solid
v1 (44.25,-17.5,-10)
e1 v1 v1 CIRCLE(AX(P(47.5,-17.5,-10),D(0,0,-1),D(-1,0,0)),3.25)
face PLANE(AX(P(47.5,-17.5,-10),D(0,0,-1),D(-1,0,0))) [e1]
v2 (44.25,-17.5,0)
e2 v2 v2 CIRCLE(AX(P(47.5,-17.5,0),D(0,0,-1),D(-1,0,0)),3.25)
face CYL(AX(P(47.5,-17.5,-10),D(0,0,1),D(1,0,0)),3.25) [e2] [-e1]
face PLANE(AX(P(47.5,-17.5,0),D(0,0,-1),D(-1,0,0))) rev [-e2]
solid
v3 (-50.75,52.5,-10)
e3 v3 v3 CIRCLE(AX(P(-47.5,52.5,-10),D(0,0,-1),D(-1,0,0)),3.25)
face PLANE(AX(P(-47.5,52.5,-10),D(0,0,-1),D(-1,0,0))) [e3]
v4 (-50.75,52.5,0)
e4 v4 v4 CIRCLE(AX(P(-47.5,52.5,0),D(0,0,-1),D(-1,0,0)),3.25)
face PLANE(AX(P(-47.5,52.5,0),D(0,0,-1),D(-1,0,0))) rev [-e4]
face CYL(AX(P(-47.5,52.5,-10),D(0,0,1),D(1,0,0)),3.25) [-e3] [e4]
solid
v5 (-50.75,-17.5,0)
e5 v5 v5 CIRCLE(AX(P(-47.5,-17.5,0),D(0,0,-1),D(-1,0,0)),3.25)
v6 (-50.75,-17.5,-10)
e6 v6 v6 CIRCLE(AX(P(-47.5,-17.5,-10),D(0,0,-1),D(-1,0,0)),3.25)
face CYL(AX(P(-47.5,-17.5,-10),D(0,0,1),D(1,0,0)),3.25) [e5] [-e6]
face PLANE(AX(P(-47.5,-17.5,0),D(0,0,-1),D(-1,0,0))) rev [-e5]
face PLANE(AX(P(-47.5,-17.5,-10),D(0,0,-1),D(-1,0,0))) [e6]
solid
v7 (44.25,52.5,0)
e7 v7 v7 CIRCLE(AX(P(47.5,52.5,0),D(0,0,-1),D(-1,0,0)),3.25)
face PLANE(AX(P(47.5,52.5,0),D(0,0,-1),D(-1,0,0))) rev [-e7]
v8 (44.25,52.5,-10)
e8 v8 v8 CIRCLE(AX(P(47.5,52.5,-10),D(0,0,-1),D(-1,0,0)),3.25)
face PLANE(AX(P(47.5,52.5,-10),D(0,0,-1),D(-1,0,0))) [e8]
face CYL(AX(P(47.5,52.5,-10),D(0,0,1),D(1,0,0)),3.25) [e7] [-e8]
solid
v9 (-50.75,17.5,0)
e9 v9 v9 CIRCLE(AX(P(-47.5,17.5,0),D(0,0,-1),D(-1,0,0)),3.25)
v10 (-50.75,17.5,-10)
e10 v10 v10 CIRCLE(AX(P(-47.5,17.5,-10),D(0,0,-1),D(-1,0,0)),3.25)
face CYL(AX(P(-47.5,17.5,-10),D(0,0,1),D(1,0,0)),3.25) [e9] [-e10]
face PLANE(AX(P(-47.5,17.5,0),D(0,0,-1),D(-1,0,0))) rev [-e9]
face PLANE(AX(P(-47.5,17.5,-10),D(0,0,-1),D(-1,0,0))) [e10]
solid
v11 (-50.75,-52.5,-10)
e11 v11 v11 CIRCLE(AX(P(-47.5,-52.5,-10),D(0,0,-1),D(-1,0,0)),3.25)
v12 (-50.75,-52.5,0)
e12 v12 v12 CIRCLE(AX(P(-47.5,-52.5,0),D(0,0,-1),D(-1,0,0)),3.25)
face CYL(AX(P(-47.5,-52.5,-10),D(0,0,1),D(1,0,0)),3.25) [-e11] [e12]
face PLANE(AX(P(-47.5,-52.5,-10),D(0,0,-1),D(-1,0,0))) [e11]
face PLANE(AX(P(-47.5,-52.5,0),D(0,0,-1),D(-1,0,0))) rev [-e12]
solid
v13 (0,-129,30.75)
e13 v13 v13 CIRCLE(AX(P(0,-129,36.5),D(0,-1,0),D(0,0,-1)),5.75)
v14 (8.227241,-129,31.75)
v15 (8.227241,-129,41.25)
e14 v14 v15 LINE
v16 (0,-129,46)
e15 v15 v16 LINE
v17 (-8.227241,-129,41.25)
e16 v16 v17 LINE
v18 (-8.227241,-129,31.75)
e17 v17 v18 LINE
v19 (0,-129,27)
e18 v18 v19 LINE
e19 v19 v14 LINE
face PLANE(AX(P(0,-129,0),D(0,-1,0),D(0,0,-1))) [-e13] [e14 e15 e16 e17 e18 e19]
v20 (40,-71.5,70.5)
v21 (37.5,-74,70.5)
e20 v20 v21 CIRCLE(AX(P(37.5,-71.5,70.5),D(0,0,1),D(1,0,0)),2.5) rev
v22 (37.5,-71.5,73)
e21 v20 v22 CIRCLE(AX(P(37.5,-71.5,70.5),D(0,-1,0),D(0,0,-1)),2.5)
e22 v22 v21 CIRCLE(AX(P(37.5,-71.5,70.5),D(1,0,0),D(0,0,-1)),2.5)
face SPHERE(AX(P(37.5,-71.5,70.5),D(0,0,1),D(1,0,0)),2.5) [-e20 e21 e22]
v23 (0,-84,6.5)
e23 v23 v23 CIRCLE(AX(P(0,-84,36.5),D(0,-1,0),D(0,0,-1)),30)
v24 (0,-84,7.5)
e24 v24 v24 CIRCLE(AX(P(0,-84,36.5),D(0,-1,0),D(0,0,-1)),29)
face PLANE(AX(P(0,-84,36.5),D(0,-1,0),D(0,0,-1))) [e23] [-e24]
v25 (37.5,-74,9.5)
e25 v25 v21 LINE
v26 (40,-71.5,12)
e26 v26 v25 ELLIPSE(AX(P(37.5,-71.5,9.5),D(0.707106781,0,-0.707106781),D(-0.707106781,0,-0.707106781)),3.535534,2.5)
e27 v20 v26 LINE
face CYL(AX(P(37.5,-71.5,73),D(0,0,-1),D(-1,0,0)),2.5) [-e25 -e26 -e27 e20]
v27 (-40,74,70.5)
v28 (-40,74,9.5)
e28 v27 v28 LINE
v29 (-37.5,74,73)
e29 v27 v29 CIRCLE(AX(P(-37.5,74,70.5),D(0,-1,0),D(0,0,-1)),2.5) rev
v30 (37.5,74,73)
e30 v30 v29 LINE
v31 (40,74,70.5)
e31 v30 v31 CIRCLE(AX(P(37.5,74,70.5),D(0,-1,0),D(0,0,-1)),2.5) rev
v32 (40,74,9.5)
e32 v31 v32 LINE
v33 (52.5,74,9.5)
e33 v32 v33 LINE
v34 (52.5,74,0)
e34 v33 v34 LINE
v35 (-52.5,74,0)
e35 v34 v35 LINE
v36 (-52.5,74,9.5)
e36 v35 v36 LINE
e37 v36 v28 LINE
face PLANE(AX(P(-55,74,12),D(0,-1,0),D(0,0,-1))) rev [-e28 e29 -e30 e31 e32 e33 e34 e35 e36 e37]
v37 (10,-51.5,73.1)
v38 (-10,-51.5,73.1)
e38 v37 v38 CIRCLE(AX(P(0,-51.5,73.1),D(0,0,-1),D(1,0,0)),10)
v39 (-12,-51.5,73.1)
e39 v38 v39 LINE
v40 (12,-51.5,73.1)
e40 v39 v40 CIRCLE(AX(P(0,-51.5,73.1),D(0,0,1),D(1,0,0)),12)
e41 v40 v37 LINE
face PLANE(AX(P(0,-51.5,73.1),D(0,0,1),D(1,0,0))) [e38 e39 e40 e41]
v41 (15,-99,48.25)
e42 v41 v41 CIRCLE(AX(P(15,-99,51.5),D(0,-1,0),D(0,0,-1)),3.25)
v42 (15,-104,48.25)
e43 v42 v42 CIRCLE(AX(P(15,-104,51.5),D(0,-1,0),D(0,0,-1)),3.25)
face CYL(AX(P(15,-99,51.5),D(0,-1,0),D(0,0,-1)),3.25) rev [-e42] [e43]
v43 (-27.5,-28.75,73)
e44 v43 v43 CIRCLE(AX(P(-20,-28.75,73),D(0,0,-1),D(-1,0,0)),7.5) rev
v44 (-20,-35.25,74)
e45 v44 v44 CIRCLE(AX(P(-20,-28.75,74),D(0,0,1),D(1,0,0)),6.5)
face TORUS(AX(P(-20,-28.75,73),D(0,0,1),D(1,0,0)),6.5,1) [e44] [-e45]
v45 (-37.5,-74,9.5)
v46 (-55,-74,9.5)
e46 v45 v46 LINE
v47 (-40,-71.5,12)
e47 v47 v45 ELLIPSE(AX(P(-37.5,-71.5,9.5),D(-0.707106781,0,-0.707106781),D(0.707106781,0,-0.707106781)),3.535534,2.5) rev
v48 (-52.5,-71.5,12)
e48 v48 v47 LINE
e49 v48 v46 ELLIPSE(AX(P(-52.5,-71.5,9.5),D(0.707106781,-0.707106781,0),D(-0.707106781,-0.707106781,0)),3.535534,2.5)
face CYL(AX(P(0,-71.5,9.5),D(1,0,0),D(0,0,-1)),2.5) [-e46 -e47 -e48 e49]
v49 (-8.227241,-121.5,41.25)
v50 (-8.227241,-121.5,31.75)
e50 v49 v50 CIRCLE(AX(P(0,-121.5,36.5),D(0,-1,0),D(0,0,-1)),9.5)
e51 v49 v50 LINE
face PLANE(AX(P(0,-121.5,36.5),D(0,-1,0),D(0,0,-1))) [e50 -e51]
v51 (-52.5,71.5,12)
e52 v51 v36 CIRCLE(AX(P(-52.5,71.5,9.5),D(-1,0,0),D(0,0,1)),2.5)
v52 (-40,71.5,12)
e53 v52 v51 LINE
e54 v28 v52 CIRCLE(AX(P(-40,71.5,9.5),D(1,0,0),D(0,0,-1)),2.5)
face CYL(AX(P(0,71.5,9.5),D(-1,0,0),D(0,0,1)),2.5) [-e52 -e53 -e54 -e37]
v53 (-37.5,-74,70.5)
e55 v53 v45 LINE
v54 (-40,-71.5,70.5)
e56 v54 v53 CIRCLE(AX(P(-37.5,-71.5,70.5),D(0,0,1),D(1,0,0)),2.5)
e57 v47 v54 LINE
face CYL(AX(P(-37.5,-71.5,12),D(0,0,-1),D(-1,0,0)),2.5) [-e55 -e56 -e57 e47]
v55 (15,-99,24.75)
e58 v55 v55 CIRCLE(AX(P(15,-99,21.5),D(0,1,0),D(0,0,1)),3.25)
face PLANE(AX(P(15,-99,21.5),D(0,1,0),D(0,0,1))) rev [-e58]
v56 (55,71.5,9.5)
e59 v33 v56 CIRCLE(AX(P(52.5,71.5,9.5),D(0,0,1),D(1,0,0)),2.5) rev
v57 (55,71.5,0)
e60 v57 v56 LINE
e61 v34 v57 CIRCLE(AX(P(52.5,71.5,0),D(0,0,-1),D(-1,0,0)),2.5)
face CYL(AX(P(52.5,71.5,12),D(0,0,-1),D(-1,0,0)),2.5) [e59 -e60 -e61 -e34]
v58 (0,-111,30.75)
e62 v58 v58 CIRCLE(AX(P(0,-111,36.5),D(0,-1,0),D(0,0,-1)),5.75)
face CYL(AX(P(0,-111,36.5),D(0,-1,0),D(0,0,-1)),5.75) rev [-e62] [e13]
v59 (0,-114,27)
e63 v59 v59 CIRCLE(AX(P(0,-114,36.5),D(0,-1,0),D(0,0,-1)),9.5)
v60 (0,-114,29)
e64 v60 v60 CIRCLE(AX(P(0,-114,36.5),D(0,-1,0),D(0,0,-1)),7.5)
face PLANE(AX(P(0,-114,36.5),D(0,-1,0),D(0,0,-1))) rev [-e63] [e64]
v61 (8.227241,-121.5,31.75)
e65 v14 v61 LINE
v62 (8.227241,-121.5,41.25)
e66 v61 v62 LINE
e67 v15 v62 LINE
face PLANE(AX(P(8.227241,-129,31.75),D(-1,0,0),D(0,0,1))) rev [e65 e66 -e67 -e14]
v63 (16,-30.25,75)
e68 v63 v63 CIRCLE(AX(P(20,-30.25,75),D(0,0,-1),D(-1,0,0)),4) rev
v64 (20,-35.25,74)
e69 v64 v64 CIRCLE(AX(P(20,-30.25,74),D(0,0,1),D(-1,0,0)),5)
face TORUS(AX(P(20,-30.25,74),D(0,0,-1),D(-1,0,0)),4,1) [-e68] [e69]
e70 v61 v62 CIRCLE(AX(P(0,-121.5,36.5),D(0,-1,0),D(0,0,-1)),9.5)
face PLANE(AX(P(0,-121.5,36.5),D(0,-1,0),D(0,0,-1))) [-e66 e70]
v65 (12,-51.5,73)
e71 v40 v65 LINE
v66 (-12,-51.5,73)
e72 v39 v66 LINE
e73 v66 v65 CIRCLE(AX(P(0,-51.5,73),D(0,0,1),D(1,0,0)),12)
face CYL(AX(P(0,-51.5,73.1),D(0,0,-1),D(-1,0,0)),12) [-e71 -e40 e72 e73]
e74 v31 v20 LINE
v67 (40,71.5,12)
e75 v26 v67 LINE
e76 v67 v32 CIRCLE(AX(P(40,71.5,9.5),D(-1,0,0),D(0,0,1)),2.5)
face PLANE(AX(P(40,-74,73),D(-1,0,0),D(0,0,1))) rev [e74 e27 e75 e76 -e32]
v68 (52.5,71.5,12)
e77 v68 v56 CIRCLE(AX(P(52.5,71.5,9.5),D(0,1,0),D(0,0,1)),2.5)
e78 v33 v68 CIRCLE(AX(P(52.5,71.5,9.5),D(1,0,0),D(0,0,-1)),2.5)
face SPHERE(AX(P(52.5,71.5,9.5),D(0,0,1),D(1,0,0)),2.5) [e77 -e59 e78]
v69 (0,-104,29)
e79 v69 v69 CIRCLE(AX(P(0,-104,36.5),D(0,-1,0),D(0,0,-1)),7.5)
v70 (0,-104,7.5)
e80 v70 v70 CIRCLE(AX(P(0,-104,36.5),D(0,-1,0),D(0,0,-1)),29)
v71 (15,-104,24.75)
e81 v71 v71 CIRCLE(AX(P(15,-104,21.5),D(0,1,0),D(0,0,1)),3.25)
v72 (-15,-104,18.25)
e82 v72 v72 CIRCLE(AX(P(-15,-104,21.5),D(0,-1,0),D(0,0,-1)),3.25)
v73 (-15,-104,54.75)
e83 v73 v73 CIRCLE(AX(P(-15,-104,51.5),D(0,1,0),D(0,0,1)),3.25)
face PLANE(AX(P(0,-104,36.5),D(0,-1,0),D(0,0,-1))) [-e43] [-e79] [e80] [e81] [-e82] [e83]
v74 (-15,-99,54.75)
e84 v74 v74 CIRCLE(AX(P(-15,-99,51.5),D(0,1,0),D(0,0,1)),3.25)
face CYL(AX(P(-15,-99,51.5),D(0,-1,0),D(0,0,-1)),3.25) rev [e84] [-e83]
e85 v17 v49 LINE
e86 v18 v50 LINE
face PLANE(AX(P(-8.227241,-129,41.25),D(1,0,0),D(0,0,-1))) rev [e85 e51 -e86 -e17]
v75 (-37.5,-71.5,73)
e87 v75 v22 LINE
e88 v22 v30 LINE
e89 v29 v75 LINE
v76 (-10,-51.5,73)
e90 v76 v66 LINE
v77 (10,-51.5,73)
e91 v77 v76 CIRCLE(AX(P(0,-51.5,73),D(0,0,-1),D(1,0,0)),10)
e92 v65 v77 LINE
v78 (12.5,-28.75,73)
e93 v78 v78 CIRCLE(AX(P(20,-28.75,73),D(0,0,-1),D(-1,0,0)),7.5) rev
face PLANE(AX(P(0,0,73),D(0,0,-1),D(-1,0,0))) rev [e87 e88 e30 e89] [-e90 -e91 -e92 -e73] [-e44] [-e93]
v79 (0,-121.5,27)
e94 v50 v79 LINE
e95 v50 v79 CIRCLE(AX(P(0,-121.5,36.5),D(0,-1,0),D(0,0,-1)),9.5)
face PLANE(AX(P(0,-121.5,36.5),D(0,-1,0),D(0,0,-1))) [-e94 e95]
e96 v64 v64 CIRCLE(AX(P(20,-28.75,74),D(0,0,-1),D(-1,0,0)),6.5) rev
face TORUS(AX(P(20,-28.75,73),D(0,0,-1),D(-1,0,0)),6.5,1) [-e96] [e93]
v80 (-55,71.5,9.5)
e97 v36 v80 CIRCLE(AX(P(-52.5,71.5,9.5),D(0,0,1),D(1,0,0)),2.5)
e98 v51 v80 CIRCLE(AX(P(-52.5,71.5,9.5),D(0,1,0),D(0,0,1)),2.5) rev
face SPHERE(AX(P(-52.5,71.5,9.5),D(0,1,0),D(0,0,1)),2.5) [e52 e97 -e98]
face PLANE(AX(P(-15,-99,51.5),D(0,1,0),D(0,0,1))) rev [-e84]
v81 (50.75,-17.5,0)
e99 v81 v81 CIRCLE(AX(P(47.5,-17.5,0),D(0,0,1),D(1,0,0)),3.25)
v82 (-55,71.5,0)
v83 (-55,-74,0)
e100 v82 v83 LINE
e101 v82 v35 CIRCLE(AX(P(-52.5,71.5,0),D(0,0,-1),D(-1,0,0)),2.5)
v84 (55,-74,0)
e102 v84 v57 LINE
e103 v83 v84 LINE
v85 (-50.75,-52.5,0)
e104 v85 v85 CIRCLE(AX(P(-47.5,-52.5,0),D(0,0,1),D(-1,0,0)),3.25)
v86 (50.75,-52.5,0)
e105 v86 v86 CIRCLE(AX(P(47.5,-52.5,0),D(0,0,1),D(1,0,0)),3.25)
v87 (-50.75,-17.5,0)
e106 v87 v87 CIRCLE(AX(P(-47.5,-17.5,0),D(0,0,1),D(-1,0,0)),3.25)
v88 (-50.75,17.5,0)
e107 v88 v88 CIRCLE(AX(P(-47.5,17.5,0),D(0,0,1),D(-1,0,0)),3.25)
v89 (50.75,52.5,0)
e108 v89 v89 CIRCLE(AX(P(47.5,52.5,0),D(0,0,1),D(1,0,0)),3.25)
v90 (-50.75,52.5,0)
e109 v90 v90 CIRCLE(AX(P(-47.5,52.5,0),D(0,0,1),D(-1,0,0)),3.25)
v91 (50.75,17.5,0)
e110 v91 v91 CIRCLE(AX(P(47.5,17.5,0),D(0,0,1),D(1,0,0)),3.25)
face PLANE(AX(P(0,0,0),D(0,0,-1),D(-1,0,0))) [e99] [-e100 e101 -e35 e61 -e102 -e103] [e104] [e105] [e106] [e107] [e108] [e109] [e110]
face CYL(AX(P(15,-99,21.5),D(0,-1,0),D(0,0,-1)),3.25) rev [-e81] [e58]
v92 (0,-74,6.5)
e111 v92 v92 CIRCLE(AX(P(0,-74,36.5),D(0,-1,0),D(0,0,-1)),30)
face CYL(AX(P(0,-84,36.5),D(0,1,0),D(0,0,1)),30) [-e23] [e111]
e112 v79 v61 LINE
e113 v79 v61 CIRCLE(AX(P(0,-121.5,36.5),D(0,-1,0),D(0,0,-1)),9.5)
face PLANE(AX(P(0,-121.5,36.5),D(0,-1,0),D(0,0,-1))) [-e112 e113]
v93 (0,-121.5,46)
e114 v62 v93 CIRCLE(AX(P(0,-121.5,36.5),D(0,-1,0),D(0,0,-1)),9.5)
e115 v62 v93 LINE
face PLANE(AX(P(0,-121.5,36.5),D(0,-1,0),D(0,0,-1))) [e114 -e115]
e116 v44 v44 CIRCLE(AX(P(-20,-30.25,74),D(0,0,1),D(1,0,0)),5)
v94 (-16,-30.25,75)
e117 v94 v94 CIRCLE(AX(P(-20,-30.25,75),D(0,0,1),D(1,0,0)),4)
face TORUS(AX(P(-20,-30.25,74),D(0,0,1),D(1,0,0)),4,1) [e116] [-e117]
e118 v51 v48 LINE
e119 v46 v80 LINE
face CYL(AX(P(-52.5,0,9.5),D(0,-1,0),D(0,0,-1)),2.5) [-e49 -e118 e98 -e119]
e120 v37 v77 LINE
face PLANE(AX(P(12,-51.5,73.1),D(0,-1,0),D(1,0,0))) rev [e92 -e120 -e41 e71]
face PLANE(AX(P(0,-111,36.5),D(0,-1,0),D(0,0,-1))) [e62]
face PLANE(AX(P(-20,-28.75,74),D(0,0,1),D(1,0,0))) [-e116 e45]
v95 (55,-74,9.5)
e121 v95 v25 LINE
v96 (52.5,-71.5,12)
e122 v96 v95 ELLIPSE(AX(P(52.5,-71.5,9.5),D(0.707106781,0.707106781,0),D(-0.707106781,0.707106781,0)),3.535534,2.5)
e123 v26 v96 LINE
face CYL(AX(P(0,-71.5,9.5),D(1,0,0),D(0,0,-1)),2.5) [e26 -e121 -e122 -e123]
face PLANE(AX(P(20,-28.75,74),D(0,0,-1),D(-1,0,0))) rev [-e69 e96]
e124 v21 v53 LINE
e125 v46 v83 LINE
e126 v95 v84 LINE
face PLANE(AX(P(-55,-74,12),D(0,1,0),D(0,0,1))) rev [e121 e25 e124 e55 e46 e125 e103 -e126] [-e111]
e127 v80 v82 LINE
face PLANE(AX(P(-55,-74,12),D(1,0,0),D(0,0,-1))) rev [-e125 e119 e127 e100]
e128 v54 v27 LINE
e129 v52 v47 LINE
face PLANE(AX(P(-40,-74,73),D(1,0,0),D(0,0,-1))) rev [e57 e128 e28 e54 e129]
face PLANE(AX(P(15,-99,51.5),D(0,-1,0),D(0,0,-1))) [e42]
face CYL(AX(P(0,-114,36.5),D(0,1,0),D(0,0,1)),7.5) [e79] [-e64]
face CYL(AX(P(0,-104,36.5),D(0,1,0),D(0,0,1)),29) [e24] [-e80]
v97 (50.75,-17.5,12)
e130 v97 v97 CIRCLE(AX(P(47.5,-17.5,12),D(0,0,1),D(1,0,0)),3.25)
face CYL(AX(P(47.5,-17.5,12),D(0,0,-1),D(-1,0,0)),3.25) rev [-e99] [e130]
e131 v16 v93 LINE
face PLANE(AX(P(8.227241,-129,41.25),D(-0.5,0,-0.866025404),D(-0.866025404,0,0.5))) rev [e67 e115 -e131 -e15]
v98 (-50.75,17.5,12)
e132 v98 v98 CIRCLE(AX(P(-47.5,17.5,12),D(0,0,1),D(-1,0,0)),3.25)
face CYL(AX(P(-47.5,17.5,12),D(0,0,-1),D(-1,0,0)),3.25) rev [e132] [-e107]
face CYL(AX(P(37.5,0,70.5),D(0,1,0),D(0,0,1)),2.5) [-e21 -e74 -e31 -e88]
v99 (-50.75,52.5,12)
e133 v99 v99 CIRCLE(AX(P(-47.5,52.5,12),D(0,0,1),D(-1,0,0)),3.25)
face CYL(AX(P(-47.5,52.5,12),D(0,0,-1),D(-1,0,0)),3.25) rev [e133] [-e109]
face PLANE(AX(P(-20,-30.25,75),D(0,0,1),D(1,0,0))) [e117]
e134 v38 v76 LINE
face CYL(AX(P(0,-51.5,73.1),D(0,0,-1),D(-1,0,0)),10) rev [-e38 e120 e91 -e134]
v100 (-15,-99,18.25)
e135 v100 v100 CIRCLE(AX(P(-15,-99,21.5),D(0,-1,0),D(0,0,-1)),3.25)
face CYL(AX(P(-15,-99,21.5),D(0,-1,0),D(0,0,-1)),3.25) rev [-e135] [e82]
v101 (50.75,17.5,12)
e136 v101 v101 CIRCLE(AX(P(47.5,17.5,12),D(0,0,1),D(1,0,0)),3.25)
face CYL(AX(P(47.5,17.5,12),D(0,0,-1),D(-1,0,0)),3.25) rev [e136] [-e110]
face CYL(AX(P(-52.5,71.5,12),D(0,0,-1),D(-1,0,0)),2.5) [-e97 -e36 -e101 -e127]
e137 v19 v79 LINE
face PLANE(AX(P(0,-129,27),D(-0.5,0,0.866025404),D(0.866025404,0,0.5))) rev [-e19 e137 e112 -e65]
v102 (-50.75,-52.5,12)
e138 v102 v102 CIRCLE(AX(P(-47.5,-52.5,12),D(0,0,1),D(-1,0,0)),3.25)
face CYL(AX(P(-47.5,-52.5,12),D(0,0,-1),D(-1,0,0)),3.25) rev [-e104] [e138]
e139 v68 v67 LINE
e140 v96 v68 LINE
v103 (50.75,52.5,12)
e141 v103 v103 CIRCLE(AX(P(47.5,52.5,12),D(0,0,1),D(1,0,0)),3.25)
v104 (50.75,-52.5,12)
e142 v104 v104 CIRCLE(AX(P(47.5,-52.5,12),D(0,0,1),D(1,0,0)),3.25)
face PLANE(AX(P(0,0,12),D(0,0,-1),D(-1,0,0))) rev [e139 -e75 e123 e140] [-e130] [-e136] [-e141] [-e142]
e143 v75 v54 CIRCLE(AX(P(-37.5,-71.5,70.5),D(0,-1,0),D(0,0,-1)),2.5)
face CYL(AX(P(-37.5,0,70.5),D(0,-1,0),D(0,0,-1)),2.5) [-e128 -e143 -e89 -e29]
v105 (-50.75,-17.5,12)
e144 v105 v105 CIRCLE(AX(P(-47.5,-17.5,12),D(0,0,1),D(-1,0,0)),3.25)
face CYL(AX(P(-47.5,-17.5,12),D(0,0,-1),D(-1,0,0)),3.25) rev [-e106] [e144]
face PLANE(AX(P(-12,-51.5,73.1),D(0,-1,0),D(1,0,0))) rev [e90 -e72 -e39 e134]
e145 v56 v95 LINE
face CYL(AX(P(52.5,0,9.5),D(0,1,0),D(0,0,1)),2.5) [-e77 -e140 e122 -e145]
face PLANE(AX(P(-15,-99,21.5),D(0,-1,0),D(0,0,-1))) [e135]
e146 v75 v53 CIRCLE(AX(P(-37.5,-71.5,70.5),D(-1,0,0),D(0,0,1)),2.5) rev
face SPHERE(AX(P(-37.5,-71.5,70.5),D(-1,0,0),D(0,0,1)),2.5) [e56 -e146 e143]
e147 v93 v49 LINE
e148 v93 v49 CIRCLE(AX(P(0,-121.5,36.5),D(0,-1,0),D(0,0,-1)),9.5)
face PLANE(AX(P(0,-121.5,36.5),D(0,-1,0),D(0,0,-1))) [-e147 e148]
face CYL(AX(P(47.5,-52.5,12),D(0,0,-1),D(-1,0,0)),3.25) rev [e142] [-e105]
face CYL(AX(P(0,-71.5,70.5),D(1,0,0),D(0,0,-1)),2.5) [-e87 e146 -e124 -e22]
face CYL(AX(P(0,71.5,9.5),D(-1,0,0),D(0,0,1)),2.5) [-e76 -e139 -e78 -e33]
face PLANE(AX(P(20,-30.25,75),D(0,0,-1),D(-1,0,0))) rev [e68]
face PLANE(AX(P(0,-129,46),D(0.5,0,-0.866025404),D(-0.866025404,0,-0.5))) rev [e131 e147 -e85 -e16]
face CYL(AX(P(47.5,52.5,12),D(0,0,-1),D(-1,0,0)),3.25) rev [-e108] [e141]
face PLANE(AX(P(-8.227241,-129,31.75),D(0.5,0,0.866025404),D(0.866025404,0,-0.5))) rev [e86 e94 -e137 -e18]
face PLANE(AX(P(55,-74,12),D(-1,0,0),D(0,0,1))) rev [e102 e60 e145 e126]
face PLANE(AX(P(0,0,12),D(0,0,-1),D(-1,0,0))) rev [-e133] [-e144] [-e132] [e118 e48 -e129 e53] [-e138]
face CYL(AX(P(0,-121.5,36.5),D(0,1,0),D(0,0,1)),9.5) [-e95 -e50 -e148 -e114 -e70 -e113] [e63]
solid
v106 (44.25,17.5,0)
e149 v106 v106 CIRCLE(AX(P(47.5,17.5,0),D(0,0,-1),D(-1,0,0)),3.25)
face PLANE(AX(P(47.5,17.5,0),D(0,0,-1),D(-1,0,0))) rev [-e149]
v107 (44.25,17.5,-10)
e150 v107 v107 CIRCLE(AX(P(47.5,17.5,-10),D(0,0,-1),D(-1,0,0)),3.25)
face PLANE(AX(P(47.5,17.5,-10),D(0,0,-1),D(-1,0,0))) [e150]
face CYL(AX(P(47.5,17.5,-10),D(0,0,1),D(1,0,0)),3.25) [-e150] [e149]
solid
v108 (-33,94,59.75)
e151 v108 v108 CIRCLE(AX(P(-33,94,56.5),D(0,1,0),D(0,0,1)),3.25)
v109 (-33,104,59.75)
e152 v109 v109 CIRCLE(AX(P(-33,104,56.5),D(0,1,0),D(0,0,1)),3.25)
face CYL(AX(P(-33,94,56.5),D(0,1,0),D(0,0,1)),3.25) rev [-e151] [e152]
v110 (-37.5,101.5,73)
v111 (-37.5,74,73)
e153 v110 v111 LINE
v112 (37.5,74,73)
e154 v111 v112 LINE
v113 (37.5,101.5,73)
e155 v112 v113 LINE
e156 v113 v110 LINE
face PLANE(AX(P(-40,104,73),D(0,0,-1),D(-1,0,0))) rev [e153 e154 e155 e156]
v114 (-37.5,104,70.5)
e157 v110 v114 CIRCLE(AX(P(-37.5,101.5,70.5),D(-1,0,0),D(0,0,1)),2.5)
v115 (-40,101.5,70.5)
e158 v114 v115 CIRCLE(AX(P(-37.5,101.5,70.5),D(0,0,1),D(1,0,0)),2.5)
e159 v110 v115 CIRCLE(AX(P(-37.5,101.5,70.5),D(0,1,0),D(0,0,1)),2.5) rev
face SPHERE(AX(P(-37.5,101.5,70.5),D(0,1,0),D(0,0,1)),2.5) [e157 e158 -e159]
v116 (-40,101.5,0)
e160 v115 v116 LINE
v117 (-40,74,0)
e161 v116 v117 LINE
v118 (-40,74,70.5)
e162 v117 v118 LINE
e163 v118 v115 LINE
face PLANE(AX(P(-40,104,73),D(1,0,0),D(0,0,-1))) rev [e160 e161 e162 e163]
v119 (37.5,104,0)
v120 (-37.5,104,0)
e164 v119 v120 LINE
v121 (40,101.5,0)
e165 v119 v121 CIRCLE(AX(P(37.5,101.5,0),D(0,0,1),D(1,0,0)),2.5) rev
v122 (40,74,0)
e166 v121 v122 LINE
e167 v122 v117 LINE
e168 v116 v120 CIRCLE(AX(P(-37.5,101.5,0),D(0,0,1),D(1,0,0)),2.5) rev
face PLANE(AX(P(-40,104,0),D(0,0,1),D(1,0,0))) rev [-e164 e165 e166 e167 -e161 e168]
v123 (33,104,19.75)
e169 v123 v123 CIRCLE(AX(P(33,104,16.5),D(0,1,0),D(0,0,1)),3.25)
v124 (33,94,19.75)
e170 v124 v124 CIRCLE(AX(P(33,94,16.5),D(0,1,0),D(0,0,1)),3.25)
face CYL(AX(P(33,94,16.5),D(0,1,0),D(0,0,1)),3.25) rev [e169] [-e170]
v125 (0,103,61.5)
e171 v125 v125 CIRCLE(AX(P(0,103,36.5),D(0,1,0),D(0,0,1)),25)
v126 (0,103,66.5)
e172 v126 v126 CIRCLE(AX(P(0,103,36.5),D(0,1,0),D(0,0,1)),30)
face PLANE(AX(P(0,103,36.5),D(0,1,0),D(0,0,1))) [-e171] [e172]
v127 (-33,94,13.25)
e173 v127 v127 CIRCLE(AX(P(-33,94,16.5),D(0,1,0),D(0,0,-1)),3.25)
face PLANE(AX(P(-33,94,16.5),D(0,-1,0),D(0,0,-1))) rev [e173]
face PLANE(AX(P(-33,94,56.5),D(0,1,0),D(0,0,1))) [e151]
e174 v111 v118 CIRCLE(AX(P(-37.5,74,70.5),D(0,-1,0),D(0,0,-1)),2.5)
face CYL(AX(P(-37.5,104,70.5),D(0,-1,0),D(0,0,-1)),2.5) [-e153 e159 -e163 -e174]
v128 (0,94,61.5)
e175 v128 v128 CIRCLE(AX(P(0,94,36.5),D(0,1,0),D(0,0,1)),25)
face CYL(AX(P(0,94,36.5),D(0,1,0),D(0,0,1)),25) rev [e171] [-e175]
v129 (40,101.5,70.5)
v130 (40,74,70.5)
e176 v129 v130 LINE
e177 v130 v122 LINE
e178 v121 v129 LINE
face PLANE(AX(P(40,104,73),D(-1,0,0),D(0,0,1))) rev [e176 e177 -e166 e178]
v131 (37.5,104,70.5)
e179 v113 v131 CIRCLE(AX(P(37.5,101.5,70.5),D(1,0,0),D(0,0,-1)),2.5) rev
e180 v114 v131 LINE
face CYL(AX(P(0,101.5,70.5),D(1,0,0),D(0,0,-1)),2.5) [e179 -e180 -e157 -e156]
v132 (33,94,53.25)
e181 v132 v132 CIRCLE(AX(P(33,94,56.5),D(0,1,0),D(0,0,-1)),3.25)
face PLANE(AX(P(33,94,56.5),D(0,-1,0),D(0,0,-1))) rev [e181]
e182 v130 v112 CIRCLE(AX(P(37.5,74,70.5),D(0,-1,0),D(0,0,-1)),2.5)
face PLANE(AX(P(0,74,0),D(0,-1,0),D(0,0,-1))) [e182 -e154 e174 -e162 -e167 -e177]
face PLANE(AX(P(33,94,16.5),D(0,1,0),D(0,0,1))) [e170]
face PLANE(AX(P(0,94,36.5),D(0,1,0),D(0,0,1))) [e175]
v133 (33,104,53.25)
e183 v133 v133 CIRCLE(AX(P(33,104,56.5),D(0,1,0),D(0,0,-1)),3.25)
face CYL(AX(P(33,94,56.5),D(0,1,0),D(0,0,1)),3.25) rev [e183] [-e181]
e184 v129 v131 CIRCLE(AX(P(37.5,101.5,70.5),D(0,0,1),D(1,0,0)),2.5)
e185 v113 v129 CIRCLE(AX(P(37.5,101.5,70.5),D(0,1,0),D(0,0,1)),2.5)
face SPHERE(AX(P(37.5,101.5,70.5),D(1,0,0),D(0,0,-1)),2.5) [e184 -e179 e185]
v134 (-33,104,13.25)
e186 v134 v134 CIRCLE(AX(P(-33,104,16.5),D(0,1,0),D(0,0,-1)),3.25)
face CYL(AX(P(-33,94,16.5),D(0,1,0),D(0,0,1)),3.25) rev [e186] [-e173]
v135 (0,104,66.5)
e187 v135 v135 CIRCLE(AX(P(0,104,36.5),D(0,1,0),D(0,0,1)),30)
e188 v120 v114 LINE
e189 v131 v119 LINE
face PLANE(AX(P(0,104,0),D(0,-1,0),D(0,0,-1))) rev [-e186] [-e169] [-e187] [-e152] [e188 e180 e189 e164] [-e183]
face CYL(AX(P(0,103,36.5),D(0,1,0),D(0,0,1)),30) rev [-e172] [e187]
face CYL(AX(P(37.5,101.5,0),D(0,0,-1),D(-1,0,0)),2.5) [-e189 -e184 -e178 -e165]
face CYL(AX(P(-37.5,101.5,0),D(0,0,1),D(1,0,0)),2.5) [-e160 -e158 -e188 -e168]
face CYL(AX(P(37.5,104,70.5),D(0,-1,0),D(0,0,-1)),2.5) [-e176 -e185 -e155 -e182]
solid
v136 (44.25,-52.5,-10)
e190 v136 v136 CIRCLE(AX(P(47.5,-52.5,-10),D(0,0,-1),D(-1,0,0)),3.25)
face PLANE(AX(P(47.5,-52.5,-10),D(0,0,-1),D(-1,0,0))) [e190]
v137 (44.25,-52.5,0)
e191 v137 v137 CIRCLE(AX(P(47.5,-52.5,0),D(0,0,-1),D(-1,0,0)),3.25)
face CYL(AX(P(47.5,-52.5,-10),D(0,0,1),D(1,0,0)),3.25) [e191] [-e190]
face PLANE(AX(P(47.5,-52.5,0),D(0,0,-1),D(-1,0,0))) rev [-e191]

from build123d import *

# Parameters (mm, degrees)
SKETCH1_W             = 110
SKETCH1_H             = 148
SKETCH1_R             = 3.25
BOSS_EXTRUDE1_DEPTH   = 12
SKETCH3_R             = 3.25
BOSS_EXTRUDE2_DEPTH   = 10
BOSS_EXTRUDE2_2_DEPTH = 10
BOSS_EXTRUDE2_3_DEPTH = 10
BOSS_EXTRUDE2_4_DEPTH = 10
BOSS_EXTRUDE2_5_DEPTH = 10
BOSS_EXTRUDE2_6_DEPTH = 10
BOSS_EXTRUDE2_7_DEPTH = 10
BOSS_EXTRUDE2_8_DEPTH = 10
SKETCH4_W             = 80
SKETCH4_H             = 148
BOSS_EXTRUDE3_DEPTH   = 61
SKETCH5_W             = 80
SKETCH5_H             = 73
BOSS_EXTRUDE4_DEPTH   = 30
SKETCH6_R             = 30
SKETCH6_R_2           = 25
CUT_EXTRUDE1_DEPTH    = 1
SKETCH8_R             = 25
CUT_EXTRUDE2_DEPTH    = 10
SKETCH10_R            = 3.25
CUT_EXTRUDE3_DEPTH    = 10
SKETCH11_R            = 30
BOSS_EXTRUDE5_DEPTH   = 10
SKETCH13_R            = 29
BOSS_EXTRUDE6_DEPTH   = 20
SKETCH14_R            = 7.5
BOSS_EXTRUDE7_DEPTH   = 10
SKETCH15_R            = 9.5
BOSS_EXTRUDE8_DEPTH   = 7.5
BOSS_EXTRUDE9_DEPTH   = 7.5
SKETCH17_R            = 5.75
CUT_EXTRUDE4_DEPTH    = 18
SKETCH18_R            = 3.25
CUT_EXTRUDE6_DEPTH    = 5
FILLET1_R             = 2.5
FILLET2_R             = 2.5
SKETCH19_R            = 7.5
BOSS_EXTRUDE10_DEPTH  = 1
SKETCH20_R            = 5
BOSS_EXTRUDE11_DEPTH  = 1
FILLET4_R             = 1
FILLET5_R             = 1
BOSS_EXTRUDE12_DEPTH  = 0.1


with BuildPart() as part:
    # Sketch1 → Boss-Extrude1 (new body)
    with BuildSketch(Plane.XY):
        Rectangle(SKETCH1_W, SKETCH1_H)
        with Locations((47.5, -52.5)):
            Circle(SKETCH1_R, mode=Mode.SUBTRACT)
        with Locations((47.5, -17.5)):
            Circle(SKETCH1_R, mode=Mode.SUBTRACT)
        with Locations((47.5, 17.5)):
            Circle(SKETCH1_R, mode=Mode.SUBTRACT)
        with Locations((47.5, 52.5)):
            Circle(SKETCH1_R, mode=Mode.SUBTRACT)
        with Locations(Location((-47.5, -52.5, 0), (0, 0, 180))):
            Circle(SKETCH1_R, mode=Mode.SUBTRACT)
        with Locations(Location((-47.5, -17.5, 0), (0, 0, 180))):
            Circle(SKETCH1_R, mode=Mode.SUBTRACT)
        with Locations(Location((-47.5, 17.5, 0), (0, 0, 180))):
            Circle(SKETCH1_R, mode=Mode.SUBTRACT)
        with Locations(Location((-47.5, 52.5, 0), (0, 0, 180))):
            Circle(SKETCH1_R, mode=Mode.SUBTRACT)
    extrude(amount=BOSS_EXTRUDE1_DEPTH)

    # Sketch4 → Boss-Extrude3 (add)
    with BuildSketch(Plane.XY.offset(12)):
        Rectangle(SKETCH4_W, SKETCH4_H)
    extrude(amount=BOSS_EXTRUDE3_DEPTH)

    # Sketch11 → Boss-Extrude5 (add)
    with BuildSketch(Plane.XZ.offset(74)):
        with Locations(Location((0, 36.5, 0), (0, 0, 90))):
            Circle(SKETCH11_R)
    extrude(amount=BOSS_EXTRUDE5_DEPTH)

    # Sketch13 → Boss-Extrude6 (add)
    with BuildSketch(Plane.XZ.offset(84)):
        with Locations(Location((0, 36.5, 0), (0, 0, 270))):
            Circle(SKETCH13_R)
    extrude(amount=BOSS_EXTRUDE6_DEPTH)

    # Sketch14 → Boss-Extrude7 (add)
    with BuildSketch(Plane.XZ.offset(104)):
        with Locations(Location((0, 36.5, 0), (0, 0, 270))):
            Circle(SKETCH14_R)
    extrude(amount=BOSS_EXTRUDE7_DEPTH)

    # Sketch15 → Boss-Extrude8 (add)
    with BuildSketch(Plane.XZ.offset(114)):
        with Locations(Location((0, 36.5, 0), (0, 0, 270))):
            Circle(SKETCH15_R)
    extrude(amount=BOSS_EXTRUDE8_DEPTH)

    # Sketch16 → Boss-Extrude9 (add)
    with BuildSketch(Plane.XZ.offset(121.5)):
        Polygon((-8.227241336, 41.25), (-8.227241336, 31.75), (0, 27), (8.227241336, 31.75), (8.227241336, 41.25), (0, 46), align=None)
    extrude(amount=BOSS_EXTRUDE9_DEPTH)

    # Sketch17 → Cut-Extrude4 (cut)
    with BuildSketch(Plane.XZ.offset(129)):
        with Locations(Location((0, 36.5, 0), (0, 0, 270))):
            Circle(SKETCH17_R)
    extrude(amount=-CUT_EXTRUDE4_DEPTH, mode=Mode.SUBTRACT)

    # Sketch18 → Cut-Extrude6 (cut)
    with BuildSketch(Plane.XZ.offset(104)):
        with Locations(Location((15, 51.5, 0), (0, 0, 270))):
            Circle(SKETCH18_R)
        with Locations(Location((15, 21.5, 0), (0, 0, 90))):
            Circle(SKETCH18_R)
        with Locations(Location((-15, 21.5, 0), (0, 0, 270))):
            Circle(SKETCH18_R)
        with Locations(Location((-15, 51.5, 0), (0, 0, 90))):
            Circle(SKETCH18_R)
    extrude(amount=-CUT_EXTRUDE6_DEPTH, mode=Mode.SUBTRACT)

    # Fillet1
    fillet1_edges = [part.edges().sort_by_distance(p)[0] for p in [
        (-55, 0, 12),
        (-47.5, -74, 12),
        (-47.5, 74, 12),
        (55, 0, 12),
        (47.5, -74, 12),
        (40, -74, 42.5),
        (-40, -74, 42.5),
        (40, 0, 73),
        (-40, 0, 73),
        (0, -74, 73),
        (-55, 74, 6),
        (55, 74, 6),
        (47.5, 74, 12),
    ]]
    fillet(fillet1_edges, radius=FILLET1_R)

    # Sketch19 → Boss-Extrude10 (add)
    with BuildSketch(Plane.XY.offset(73)):
        with Locations(Location((-20, -28.75, 0), (0, 0, 180))):
            Circle(SKETCH19_R)
        with Locations(Location((20, -28.75, 0), (0, 0, 180))):
            Circle(SKETCH19_R)
    extrude(amount=BOSS_EXTRUDE10_DEPTH)

    # Sketch20 → Boss-Extrude11 (add)
    with BuildSketch(Plane.XY.offset(74)):
        with Locations((-20, -30.25)):
            Circle(SKETCH20_R)
        with Locations(Location((20, -30.25, 0), (0, 0, 180))):
            Circle(SKETCH20_R)
    extrude(amount=BOSS_EXTRUDE11_DEPTH)

    # Fillet4
    fillet4_edges = [part.edges().sort_by_distance(p)[0] for p in [
        (-12.5, -28.75, 74),
        (27.5, -28.75, 74),
    ]]
    fillet(fillet4_edges, radius=FILLET4_R - 0.0001)  # a hair under: the kernel refuses the full size

    # Fillet5
    fillet5_edges = [part.edges().sort_by_distance(p)[0] for p in [
        (-25, -30.25, 75),
        (25, -30.25, 75),
    ]]
    fillet(fillet5_edges, radius=FILLET5_R - 0.0001)  # a hair under: the kernel refuses the full size

    # Sketch21 → Boss-Extrude12 (add)
    with BuildSketch(Plane.XY.offset(73)):
        with BuildLine():
            Line((-12, -51.5), (-10, -51.5))
            ThreePointArc((-10, -51.5), (0, -61.5), (10, -51.5))
            Line((10, -51.5), (12, -51.5))
            ThreePointArc((12, -51.5), (0, -63.5), (-12, -51.5))
        make_face()
    extrude(amount=BOSS_EXTRUDE12_DEPTH)


with BuildPart() as body_2:
    # Sketch3 → Boss-Extrude2 (new body)
    with BuildSketch(Plane(origin=(0, 0, 0), x_dir=(-1, 0, 0), z_dir=(0, 0, -1))):
        with Locations((-47.5, 52.5)):
            Circle(SKETCH3_R)
    extrude(amount=BOSS_EXTRUDE2_DEPTH)


with BuildPart() as body_3:
    # Sketch3 → Boss-Extrude2 2 (new body)
    with BuildSketch(Plane(origin=(0, 0, 0), x_dir=(-1, 0, 0), z_dir=(0, 0, -1))):
        with Locations((-47.5, 17.5)):
            Circle(SKETCH3_R)
    extrude(amount=BOSS_EXTRUDE2_2_DEPTH)


with BuildPart() as body_4:
    # Sketch3 → Boss-Extrude2 3 (new body)
    with BuildSketch(Plane(origin=(0, 0, 0), x_dir=(-1, 0, 0), z_dir=(0, 0, -1))):
        with Locations((-47.5, -17.5)):
            Circle(SKETCH3_R)
    extrude(amount=BOSS_EXTRUDE2_3_DEPTH)


with BuildPart() as body_5:
    # Sketch3 → Boss-Extrude2 4 (new body)
    with BuildSketch(Plane(origin=(0, 0, 0), x_dir=(-1, 0, 0), z_dir=(0, 0, -1))):
        with Locations((-47.5, -52.5)):
            Circle(SKETCH3_R)
    extrude(amount=BOSS_EXTRUDE2_4_DEPTH)


with BuildPart() as body_6:
    # Sketch3 → Boss-Extrude2 5 (new body)
    with BuildSketch(Plane(origin=(0, 0, 0), x_dir=(-1, 0, 0), z_dir=(0, 0, -1))):
        with Locations((47.5, -52.5)):
            Circle(SKETCH3_R)
    extrude(amount=BOSS_EXTRUDE2_5_DEPTH)


with BuildPart() as body_7:
    # Sketch3 → Boss-Extrude2 6 (new body)
    with BuildSketch(Plane(origin=(0, 0, 0), x_dir=(-1, 0, 0), z_dir=(0, 0, -1))):
        with Locations((47.5, -17.5)):
            Circle(SKETCH3_R)
    extrude(amount=BOSS_EXTRUDE2_6_DEPTH)


with BuildPart() as body_8:
    # Sketch3 → Boss-Extrude2 7 (new body)
    with BuildSketch(Plane(origin=(0, 0, 0), x_dir=(-1, 0, 0), z_dir=(0, 0, -1))):
        with Locations((47.5, 17.5)):
            Circle(SKETCH3_R)
    extrude(amount=BOSS_EXTRUDE2_7_DEPTH)


with BuildPart() as body_9:
    # Sketch3 → Boss-Extrude2 8 (new body)
    with BuildSketch(Plane(origin=(0, 0, 0), x_dir=(-1, 0, 0), z_dir=(0, 0, -1))):
        with Locations((47.5, 52.5)):
            Circle(SKETCH3_R)
    extrude(amount=BOSS_EXTRUDE2_8_DEPTH)


with BuildPart() as body_10:
    # Sketch5 → Boss-Extrude4 (new body)
    with BuildSketch(Plane(origin=(0, 74, 0), x_dir=(1, 0, 0), z_dir=(0, 1, 0))):
        with Locations((0, -36.5)):
            Rectangle(SKETCH5_W, SKETCH5_H)
    extrude(amount=BOSS_EXTRUDE4_DEPTH)

    # Sketch6 → Cut-Extrude1 (cut)
    with BuildSketch(Plane(origin=(0, 104, 0), x_dir=(1, 0, 0), z_dir=(0, 1, 0))):
        with Locations(Location((0, -36.5, 0), (0, 0, 270))):
            Circle(SKETCH6_R)
        with Locations(Location((0, -36.5, 0), (0, 0, 270))):
            Circle(SKETCH6_R_2, mode=Mode.SUBTRACT)
    extrude(amount=-CUT_EXTRUDE1_DEPTH, mode=Mode.SUBTRACT)

    # Sketch8 → Cut-Extrude2 (cut)
    with BuildSketch(Plane(origin=(0, 104, 0), x_dir=(1, 0, 0), z_dir=(0, 1, 0))):
        with Locations(Location((0, -36.5, 0), (0, 0, 270))):
            Circle(SKETCH8_R)
    extrude(amount=-CUT_EXTRUDE2_DEPTH, mode=Mode.SUBTRACT)

    # Sketch10 → Cut-Extrude3 (cut)
    with BuildSketch(Plane(origin=(0, 104, 0), x_dir=(1, 0, 0), z_dir=(0, 1, 0))):
        with Locations(Location((33, -16.5, 0), (0, 0, 270))):
            Circle(SKETCH10_R)
        with Locations(Location((33, -56.5, 0), (0, 0, 90))):
            Circle(SKETCH10_R)
        with Locations(Location((-33, -56.5, 0), (0, 0, 270))):
            Circle(SKETCH10_R)
        with Locations(Location((-33, -16.5, 0), (0, 0, 90))):
            Circle(SKETCH10_R)
    extrude(amount=-CUT_EXTRUDE3_DEPTH, mode=Mode.SUBTRACT)

    # Fillet2
    fillet2_edges = [body_10.edges().sort_by_distance(p)[0] for p in [
        (40, 104, 36.5),
        (-40, 104, 36.5),
        (40, 89, 73),
        (-40, 89, 73),
        (0, 104, 73),
    ]]
    fillet(fillet2_edges, radius=FILLET2_R)


solid = Compound([part.part, body_2.part, body_3.part, body_4.part, body_5.part, body_6.part, body_7.part, body_8.part, body_9.part, body_10.part])
